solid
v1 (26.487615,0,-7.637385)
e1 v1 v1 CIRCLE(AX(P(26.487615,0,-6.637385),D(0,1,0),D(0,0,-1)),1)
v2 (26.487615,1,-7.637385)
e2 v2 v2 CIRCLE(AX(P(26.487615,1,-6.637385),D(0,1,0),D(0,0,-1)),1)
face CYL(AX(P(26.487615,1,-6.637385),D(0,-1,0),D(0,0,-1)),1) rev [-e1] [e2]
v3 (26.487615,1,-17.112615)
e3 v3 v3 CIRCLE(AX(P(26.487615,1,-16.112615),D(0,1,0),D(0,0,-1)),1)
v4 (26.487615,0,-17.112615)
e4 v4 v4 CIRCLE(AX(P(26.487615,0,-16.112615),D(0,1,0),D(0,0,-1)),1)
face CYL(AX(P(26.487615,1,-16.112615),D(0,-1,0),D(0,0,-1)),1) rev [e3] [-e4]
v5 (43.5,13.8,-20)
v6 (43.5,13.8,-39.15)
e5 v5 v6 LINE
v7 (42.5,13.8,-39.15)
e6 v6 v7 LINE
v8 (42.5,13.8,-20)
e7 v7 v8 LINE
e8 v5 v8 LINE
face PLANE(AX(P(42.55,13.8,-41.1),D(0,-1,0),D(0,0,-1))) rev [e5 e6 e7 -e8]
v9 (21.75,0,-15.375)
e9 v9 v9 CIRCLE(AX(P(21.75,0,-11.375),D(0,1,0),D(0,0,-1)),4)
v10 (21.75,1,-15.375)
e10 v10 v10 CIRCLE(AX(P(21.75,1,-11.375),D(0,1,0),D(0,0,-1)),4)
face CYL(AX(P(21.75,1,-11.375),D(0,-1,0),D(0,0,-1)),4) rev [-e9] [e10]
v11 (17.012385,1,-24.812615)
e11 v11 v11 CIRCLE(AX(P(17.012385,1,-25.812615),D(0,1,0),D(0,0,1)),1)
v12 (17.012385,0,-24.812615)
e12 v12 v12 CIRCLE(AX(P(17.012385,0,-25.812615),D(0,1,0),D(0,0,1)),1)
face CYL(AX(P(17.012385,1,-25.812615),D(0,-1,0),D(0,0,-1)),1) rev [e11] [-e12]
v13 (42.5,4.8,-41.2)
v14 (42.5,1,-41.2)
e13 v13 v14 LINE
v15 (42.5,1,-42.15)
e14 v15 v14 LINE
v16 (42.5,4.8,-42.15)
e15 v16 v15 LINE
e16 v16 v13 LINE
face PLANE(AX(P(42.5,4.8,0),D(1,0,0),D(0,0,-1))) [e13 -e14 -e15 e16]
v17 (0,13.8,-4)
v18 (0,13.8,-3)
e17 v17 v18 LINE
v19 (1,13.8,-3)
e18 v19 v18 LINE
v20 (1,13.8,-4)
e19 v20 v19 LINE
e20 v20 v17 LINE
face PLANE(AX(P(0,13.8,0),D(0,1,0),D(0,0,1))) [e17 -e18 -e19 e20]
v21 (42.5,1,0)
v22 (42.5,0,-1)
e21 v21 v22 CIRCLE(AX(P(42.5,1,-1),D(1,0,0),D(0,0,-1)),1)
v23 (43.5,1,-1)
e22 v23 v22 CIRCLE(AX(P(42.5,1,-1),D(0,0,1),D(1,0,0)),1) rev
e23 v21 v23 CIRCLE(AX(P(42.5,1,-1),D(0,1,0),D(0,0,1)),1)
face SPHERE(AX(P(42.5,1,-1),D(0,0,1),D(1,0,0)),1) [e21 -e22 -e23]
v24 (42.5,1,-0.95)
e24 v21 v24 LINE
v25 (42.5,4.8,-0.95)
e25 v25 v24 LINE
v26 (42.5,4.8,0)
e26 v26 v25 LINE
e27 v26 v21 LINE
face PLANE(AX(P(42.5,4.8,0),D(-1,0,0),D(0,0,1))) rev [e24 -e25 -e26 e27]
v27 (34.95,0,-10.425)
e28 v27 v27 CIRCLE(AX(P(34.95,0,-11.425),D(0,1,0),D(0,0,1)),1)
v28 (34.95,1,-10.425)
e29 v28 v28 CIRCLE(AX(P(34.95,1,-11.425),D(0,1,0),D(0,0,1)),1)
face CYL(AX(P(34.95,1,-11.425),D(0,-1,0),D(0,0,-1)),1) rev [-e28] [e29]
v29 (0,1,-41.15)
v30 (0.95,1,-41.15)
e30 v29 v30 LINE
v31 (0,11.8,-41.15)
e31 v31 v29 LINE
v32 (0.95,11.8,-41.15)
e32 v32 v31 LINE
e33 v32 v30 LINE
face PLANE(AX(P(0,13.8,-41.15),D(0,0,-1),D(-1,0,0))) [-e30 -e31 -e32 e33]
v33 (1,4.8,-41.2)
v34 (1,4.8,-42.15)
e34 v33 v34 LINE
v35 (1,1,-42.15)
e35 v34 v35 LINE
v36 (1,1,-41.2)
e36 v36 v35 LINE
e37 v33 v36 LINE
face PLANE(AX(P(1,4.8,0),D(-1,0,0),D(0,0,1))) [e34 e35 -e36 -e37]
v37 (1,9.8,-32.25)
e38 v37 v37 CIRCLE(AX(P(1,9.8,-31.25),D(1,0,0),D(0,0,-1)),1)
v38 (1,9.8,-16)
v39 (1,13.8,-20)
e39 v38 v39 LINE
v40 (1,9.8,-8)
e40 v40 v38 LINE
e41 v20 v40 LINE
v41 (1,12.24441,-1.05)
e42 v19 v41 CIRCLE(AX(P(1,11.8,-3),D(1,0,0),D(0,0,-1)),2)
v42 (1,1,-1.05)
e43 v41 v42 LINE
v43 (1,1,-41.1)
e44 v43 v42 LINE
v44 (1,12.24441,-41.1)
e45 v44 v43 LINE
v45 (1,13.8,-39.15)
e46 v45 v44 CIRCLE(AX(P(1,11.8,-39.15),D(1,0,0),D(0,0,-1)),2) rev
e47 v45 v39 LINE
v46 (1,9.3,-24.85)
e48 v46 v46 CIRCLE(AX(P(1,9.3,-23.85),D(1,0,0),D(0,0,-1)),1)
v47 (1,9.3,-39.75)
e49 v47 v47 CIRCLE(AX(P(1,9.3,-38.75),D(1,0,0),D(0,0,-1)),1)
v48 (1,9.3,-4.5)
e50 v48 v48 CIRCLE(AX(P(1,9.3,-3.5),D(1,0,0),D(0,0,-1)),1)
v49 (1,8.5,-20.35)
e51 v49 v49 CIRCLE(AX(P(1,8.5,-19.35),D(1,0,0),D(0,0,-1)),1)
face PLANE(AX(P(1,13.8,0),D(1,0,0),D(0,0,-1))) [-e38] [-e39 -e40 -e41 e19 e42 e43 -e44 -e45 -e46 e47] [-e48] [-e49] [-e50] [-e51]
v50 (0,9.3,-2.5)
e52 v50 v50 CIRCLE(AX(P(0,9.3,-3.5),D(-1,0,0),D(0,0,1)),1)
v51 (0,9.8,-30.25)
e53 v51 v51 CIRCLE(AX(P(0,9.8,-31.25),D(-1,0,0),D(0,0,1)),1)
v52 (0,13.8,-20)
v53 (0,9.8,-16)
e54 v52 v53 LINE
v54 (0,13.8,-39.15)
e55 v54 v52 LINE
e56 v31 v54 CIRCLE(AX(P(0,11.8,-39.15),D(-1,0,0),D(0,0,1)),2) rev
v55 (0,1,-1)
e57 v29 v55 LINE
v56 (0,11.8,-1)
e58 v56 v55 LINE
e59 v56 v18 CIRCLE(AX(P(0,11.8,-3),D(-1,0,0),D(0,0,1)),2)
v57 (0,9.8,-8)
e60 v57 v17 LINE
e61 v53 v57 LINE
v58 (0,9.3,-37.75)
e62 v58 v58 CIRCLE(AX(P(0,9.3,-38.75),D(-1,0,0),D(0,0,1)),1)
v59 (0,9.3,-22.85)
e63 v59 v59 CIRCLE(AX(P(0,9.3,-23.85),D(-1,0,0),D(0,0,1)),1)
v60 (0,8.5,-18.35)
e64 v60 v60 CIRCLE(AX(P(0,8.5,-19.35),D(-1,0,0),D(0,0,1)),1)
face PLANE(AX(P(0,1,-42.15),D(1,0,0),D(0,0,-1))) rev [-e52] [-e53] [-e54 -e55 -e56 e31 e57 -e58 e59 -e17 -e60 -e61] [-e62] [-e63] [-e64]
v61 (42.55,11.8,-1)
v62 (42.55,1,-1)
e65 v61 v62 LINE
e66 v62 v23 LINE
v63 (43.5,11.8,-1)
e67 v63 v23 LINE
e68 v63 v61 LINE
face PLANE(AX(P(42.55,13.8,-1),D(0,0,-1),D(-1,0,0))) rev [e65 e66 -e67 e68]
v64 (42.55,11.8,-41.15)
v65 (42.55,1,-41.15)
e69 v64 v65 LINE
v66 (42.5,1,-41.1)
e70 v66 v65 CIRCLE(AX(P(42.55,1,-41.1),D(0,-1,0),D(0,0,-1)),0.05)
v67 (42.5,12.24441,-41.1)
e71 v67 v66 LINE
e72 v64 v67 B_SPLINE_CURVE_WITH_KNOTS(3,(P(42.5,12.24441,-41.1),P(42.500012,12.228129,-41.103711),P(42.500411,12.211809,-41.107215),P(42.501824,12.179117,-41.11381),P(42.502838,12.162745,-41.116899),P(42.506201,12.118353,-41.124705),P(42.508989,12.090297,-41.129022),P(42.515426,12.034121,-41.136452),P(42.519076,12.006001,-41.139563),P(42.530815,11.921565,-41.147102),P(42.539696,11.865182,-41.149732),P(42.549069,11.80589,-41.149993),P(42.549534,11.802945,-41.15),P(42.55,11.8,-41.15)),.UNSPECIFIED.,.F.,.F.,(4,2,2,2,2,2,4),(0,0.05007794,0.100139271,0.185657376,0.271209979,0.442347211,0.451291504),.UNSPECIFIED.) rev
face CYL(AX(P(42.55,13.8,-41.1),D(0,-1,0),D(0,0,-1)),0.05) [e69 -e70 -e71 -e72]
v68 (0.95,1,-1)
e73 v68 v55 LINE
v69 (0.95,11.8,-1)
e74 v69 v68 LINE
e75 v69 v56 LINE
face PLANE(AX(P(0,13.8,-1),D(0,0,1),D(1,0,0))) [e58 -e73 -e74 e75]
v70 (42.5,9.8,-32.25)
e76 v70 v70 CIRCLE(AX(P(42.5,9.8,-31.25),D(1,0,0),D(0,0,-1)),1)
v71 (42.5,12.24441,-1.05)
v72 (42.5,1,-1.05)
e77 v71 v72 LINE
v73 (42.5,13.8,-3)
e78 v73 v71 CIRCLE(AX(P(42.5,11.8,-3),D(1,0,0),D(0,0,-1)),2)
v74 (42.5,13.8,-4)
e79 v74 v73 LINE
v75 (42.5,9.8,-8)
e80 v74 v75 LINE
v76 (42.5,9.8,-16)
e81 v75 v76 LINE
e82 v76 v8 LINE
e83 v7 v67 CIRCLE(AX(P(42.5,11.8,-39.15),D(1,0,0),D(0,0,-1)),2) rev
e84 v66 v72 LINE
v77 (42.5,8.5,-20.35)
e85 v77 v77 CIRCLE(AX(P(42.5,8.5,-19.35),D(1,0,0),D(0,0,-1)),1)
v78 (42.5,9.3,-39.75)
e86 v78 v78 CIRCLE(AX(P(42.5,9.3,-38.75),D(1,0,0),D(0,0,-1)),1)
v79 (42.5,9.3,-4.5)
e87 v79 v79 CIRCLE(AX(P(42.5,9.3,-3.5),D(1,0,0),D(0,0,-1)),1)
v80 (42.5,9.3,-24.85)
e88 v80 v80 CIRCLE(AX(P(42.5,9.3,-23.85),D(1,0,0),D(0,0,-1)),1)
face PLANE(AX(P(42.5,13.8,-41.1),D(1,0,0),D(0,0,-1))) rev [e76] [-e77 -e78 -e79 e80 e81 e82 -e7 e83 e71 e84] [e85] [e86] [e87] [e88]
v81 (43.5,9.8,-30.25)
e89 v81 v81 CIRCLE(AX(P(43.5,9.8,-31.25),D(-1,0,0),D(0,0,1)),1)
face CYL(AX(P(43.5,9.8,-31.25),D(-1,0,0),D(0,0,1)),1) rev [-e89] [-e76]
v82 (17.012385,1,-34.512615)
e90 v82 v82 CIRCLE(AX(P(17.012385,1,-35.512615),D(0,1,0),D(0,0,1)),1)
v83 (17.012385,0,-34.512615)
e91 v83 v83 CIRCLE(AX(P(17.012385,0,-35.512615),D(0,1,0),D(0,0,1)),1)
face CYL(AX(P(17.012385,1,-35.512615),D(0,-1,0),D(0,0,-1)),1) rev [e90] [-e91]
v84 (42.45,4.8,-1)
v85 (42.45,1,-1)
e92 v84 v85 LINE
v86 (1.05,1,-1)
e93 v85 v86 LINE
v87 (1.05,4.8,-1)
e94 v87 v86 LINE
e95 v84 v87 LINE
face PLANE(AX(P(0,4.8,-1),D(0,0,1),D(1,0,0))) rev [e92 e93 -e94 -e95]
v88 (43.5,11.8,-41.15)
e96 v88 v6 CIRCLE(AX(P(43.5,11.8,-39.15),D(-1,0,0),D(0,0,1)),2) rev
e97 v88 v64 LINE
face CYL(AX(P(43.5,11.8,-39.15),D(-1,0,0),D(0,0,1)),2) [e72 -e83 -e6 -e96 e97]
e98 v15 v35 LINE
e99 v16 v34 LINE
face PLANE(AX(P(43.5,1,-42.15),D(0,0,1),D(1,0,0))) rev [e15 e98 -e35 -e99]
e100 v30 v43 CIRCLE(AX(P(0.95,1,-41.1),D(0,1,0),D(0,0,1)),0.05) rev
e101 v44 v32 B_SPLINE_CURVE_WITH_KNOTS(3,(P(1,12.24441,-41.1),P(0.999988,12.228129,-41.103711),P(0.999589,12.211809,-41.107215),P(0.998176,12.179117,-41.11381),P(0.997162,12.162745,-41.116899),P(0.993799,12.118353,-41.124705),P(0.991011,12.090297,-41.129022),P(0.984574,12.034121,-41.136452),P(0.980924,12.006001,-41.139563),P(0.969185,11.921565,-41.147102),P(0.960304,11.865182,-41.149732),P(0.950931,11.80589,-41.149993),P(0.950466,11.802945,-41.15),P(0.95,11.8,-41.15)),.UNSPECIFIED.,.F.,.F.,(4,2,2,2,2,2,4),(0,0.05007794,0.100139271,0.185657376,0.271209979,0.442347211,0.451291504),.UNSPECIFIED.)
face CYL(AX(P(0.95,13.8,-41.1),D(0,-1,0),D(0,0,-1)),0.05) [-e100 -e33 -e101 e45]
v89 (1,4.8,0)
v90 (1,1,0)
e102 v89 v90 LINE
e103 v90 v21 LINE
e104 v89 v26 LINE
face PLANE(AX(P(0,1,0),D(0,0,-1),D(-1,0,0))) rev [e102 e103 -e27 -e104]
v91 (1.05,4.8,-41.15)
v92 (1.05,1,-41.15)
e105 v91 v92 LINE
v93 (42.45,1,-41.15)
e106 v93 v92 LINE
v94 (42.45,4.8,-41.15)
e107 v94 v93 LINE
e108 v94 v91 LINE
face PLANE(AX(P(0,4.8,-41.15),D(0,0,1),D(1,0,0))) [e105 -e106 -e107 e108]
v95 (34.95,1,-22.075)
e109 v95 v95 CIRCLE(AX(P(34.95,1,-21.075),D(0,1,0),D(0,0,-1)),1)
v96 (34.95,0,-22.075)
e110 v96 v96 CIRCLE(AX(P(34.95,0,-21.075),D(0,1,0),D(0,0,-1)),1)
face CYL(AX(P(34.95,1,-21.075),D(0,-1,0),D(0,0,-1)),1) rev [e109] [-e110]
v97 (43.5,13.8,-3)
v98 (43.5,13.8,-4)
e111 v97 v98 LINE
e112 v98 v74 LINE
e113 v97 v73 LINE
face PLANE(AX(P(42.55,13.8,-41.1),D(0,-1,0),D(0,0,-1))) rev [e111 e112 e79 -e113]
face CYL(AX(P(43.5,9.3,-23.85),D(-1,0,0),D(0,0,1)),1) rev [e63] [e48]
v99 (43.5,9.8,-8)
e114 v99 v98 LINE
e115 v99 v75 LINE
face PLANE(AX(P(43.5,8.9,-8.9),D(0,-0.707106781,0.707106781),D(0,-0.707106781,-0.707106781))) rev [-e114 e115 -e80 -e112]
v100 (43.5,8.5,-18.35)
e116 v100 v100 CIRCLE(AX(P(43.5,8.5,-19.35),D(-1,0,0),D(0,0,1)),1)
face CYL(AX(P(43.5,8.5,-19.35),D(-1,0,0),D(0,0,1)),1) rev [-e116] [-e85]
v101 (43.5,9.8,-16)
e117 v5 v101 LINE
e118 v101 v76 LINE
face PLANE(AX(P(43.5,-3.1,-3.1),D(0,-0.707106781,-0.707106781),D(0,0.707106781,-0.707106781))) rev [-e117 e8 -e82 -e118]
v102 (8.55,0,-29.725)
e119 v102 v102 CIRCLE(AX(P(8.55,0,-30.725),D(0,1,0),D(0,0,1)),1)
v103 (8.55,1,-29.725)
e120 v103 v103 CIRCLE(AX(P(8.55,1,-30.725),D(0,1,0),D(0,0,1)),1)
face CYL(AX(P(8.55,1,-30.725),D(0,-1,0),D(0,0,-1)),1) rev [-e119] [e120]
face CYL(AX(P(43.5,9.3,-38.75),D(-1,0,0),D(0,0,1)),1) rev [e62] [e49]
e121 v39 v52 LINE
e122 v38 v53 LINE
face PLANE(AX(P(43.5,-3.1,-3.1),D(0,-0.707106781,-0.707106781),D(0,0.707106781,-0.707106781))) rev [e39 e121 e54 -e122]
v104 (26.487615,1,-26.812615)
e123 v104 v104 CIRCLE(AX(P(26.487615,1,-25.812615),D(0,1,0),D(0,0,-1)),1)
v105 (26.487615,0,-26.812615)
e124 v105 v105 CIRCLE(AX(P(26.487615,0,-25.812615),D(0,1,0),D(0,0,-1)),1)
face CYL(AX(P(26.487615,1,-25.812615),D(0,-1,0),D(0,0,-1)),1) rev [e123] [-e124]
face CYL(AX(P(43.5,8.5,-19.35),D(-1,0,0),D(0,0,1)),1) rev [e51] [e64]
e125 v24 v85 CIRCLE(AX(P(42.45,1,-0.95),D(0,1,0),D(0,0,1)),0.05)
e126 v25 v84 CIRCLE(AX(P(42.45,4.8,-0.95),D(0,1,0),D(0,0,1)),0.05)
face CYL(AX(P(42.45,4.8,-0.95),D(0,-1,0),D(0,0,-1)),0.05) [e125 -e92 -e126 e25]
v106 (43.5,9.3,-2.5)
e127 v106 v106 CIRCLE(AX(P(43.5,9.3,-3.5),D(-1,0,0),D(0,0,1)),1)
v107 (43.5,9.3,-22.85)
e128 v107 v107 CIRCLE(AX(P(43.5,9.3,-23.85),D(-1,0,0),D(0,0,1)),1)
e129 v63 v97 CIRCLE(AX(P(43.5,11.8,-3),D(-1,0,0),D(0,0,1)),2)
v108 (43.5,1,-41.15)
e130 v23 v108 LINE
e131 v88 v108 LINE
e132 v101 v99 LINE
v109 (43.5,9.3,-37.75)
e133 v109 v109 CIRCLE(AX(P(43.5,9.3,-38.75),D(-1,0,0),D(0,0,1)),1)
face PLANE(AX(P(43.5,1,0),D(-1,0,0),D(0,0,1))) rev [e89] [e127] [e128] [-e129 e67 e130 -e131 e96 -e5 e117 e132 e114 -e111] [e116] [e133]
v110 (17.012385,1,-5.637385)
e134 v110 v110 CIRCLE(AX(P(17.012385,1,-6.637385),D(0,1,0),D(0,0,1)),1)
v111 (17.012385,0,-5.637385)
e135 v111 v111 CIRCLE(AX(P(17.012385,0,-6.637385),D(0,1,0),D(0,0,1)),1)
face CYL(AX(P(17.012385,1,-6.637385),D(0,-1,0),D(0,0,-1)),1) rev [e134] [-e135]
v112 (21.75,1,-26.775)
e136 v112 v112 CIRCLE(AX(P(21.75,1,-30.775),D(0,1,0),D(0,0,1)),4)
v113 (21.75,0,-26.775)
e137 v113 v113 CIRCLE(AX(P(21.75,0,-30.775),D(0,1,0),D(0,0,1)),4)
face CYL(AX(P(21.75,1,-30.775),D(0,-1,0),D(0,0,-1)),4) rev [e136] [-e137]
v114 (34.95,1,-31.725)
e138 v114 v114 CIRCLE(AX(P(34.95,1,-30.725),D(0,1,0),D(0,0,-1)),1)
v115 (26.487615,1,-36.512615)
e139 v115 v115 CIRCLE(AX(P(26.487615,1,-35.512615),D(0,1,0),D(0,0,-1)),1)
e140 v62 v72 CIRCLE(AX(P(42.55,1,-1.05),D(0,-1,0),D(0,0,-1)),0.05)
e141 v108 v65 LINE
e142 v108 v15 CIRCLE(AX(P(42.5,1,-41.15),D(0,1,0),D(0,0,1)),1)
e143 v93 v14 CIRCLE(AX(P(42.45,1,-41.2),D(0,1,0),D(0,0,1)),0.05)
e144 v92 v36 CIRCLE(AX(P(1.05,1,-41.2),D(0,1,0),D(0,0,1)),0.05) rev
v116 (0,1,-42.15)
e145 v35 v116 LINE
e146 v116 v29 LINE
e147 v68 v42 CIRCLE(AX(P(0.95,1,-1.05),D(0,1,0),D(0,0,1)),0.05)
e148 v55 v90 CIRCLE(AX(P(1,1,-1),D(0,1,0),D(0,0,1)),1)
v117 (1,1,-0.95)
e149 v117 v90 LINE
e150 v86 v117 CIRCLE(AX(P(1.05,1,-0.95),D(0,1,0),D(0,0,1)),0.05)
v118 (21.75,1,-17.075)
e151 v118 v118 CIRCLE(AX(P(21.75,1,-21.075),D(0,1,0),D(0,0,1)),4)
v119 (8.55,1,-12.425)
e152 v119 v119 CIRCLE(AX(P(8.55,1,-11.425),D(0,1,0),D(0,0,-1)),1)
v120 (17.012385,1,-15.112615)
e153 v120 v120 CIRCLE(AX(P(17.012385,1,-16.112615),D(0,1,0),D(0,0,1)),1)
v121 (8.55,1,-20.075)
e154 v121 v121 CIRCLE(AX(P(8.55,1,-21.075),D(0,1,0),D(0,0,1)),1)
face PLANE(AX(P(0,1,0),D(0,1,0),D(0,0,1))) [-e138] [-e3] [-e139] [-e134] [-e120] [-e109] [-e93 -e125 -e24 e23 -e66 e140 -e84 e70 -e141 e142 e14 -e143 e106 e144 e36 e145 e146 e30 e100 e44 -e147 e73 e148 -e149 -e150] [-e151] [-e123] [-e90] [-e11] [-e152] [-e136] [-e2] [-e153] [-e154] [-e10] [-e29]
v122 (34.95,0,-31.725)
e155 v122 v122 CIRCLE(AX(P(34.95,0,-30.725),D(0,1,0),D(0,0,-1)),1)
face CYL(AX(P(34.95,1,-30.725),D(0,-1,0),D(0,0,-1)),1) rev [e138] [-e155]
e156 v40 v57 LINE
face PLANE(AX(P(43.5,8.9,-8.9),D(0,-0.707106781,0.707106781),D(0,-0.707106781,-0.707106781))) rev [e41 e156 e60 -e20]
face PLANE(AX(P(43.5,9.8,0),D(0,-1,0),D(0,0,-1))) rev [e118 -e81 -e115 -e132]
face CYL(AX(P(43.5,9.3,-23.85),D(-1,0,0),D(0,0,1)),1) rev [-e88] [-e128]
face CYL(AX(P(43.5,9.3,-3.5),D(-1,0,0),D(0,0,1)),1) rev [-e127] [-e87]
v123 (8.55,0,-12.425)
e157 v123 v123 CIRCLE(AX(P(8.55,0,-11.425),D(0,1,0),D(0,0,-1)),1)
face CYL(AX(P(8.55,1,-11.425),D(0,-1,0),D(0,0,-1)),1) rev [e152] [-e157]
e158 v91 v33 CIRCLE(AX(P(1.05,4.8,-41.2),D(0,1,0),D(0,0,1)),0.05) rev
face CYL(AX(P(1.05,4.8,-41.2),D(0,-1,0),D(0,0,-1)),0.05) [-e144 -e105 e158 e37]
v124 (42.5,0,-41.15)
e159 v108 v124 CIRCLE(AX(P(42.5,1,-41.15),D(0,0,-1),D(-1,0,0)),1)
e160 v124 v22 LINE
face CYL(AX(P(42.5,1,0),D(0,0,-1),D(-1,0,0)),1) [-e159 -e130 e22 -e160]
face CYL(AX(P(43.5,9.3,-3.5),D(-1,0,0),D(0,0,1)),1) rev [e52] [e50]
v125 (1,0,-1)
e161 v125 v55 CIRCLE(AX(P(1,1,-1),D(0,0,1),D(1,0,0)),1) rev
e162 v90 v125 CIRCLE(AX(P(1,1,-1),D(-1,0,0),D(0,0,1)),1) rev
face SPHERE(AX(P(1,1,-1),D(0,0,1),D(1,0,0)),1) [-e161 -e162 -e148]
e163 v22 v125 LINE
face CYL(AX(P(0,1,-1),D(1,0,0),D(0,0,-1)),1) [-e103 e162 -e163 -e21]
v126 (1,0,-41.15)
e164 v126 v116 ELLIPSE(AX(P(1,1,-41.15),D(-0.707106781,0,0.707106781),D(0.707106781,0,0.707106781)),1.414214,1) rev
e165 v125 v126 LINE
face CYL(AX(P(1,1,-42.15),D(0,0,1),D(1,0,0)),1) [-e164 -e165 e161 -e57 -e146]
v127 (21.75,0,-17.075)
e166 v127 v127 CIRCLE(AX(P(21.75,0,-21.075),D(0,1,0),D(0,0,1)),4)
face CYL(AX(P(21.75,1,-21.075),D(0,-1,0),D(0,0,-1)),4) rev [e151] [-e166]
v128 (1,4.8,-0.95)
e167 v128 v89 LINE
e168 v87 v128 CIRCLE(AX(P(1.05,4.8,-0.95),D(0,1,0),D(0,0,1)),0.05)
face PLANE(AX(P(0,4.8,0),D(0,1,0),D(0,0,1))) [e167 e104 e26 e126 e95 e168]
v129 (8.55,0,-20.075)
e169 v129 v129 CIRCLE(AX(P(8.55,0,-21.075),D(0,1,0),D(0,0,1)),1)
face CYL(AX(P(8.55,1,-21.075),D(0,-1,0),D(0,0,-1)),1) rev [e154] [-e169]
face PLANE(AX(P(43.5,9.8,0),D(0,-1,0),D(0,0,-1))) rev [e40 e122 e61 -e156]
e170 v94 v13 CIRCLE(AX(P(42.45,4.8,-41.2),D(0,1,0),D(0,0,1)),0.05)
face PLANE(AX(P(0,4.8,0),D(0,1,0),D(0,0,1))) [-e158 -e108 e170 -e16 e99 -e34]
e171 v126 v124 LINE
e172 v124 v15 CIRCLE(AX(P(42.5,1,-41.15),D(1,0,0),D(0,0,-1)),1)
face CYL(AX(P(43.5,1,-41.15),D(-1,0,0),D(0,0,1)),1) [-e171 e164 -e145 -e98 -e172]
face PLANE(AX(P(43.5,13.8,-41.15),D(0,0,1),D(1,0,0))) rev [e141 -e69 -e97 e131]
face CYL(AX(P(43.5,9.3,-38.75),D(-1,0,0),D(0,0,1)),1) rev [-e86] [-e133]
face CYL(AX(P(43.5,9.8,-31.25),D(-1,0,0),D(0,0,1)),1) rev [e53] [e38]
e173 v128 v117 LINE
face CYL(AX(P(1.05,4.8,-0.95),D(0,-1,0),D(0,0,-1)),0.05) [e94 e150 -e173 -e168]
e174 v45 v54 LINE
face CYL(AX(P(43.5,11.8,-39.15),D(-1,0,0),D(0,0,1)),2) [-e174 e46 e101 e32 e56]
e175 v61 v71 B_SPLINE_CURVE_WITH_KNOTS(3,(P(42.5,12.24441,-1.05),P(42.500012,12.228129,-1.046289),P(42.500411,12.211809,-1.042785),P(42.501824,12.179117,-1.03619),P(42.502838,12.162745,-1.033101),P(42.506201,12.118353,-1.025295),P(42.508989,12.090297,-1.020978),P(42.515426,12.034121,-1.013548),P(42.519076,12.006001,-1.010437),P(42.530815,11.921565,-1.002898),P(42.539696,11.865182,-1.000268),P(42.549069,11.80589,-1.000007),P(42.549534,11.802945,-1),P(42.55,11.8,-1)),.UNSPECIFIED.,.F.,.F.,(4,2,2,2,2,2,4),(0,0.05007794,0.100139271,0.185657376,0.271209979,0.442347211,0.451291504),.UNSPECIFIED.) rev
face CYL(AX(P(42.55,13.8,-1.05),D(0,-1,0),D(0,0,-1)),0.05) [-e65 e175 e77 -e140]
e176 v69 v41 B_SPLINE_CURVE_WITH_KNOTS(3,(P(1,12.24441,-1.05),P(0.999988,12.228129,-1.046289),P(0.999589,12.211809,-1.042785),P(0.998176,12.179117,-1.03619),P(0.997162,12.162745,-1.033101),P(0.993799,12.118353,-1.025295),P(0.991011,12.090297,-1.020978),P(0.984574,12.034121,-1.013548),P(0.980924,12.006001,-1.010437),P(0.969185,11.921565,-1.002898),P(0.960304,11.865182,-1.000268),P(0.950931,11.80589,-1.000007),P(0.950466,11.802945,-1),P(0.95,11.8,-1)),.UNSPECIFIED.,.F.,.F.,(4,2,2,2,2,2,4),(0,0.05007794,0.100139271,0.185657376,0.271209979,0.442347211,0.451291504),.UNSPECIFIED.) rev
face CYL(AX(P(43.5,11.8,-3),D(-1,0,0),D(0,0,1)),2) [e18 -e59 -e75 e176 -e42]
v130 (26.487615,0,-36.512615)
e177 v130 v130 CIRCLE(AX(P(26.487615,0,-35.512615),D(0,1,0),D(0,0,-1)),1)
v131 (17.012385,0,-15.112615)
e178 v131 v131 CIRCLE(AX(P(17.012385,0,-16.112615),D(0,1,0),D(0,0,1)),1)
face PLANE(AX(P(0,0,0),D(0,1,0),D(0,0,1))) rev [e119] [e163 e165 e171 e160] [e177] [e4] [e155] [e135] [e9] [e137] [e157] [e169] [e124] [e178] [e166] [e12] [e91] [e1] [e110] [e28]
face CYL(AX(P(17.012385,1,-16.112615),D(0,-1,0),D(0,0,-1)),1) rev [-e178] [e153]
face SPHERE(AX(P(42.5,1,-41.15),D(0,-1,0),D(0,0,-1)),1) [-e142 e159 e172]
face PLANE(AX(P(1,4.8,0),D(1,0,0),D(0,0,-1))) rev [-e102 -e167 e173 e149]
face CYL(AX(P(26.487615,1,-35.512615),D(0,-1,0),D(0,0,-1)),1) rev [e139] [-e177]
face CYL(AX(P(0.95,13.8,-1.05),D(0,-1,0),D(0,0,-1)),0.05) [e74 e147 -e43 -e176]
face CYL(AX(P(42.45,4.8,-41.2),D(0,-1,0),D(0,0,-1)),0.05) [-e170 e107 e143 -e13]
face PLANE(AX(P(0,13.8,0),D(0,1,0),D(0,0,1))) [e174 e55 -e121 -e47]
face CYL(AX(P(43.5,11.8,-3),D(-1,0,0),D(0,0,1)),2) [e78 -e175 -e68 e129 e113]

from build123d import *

# Parameters (mm, degrees)
SKETCH1_W           = 43.5
SKETCH1_H           = 42.15
SKETCH1_R           = 4
SKETCH1_R_2         = 1
BOSS_EXTRUDE1_DEPTH = 1
BOSS_EXTRUDE2_DEPTH = 3.8
BOSS_EXTRUDE5_DEPTH = 12.8
FILLET1_R           = 1
SKETCH3_R           = 1
CUT_EXTRUDE1_DEPTH  = 63.12336517


with BuildPart() as part:
    # Sketch1 → Boss-Extrude1 (new body)
    with BuildSketch(Plane(origin=(0, 0, 0), x_dir=(1, 0, 0), z_dir=(0, 1, 0))):
        with Locations((21.75, 21.075)):
            Rectangle(SKETCH1_W, SKETCH1_H)
        with Locations(Location((21.75, 21.075, 0), (0, 0, 270))):
            Circle(SKETCH1_R, mode=Mode.SUBTRACT)
        with Locations(Location((21.75, 30.775, 0), (0, 0, 270))):
            Circle(SKETCH1_R, mode=Mode.SUBTRACT)
        with Locations(Location((21.75, 11.375, 0), (0, 0, 90))):
            Circle(SKETCH1_R, mode=Mode.SUBTRACT)
        with Locations(Location((8.55, 21.075, 0), (0, 0, 270))):
            Circle(SKETCH1_R_2, mode=Mode.SUBTRACT)
        with Locations(Location((8.55, 30.725, 0), (0, 0, 270))):
            Circle(SKETCH1_R_2, mode=Mode.SUBTRACT)
        with Locations(Location((8.55, 11.425, 0), (0, 0, 90))):
            Circle(SKETCH1_R_2, mode=Mode.SUBTRACT)
        with Locations(Location((34.95, 11.425, 0), (0, 0, 270))):
            Circle(SKETCH1_R_2, mode=Mode.SUBTRACT)
        with Locations(Location((34.95, 21.075, 0), (0, 0, 90))):
            Circle(SKETCH1_R_2, mode=Mode.SUBTRACT)
        with Locations(Location((34.95, 30.725, 0), (0, 0, 90))):
            Circle(SKETCH1_R_2, mode=Mode.SUBTRACT)
        with Locations(Location((17.012384566, 35.512615434, 0), (0, 0, 270))):
            Circle(SKETCH1_R_2, mode=Mode.SUBTRACT)
        with Locations(Location((17.012384566, 25.812615434, 0), (0, 0, 270))):
            Circle(SKETCH1_R_2, mode=Mode.SUBTRACT)
        with Locations(Location((17.012384566, 16.112615434, 0), (0, 0, 270))):
            Circle(SKETCH1_R_2, mode=Mode.SUBTRACT)
        with Locations(Location((17.012384566, 6.637384566, 0), (0, 0, 270))):
            Circle(SKETCH1_R_2, mode=Mode.SUBTRACT)
        with Locations(Location((26.487615434, 6.637384566, 0), (0, 0, 90))):
            Circle(SKETCH1_R_2, mode=Mode.SUBTRACT)
        with Locations(Location((26.487615434, 16.112615434, 0), (0, 0, 90))):
            Circle(SKETCH1_R_2, mode=Mode.SUBTRACT)
        with Locations(Location((26.487615434, 25.812615434, 0), (0, 0, 90))):
            Circle(SKETCH1_R_2, mode=Mode.SUBTRACT)
        with Locations(Location((26.487615434, 35.512615434, 0), (0, 0, 90))):
            Circle(SKETCH1_R_2, mode=Mode.SUBTRACT)
    extrude(amount=BOSS_EXTRUDE1_DEPTH)

    # Sketch2 → Boss-Extrude2 (add)
    with BuildSketch(Plane(origin=(0, 1, 0), x_dir=(1, 0, 0), z_dir=(0, 1, 0))):
        with BuildLine():
            Line((1, 0.95), (1, 0))
            Line((1, 0), (42.5, 0))
            Line((42.5, 0), (42.5, 0.95))
            ThreePointArc((42.5, 0.95), (42.485355339, 0.985355339), (42.45, 1))
            Line((42.45, 1), (1.05, 1))
            ThreePointArc((1.05, 1), (1.014644661, 0.985355339), (1, 0.95))
        make_face()
        with BuildLine():
            Line((1.05, 41.15), (42.45, 41.15))
            ThreePointArc((42.45, 41.15), (42.485355339, 41.164644661), (42.5, 41.2))
            Line((42.5, 41.2), (42.5, 42.15))
            Line((42.5, 42.15), (1, 42.15))
            Line((1, 42.15), (1, 41.2))
            ThreePointArc((1, 41.2), (1.014644661, 41.164644661), (1.05, 41.15))
        make_face()
    extrude(amount=BOSS_EXTRUDE2_DEPTH)

    # Sketch2<6> → Boss-Extrude5 (add)
    with BuildSketch(Plane(origin=(0, 1, 0), x_dir=(1, 0, 0), z_dir=(0, 1, 0))):
        with BuildLine():
            Line((0.95, 41.15), (0, 41.15))
            Line((0, 41.15), (0, 1))
            Line((0, 1), (0.95, 1))
            ThreePointArc((0.95, 1), (0.985355339, 1.014644661), (1, 1.05))
            Line((1, 1.05), (1, 41.1))
            ThreePointArc((1, 41.1), (0.985355339, 41.135355339), (0.95, 41.15))
        make_face()
        with BuildLine():
            Line((43.5, 1), (43.5, 41.15))
            Line((43.5, 41.15), (42.55, 41.15))
            ThreePointArc((42.55, 41.15), (42.514644661, 41.135355339), (42.5, 41.1))
            Line((42.5, 41.1), (42.5, 1.05))
            ThreePointArc((42.5, 1.05), (42.514644661, 1.014644661), (42.55, 1))
            Line((42.55, 1), (43.5, 1))
        make_face()
    extrude(amount=BOSS_EXTRUDE5_DEPTH)

    # Fillet1
    # the kernel refuses this fillet: 1 mm, written as the material it takes off along each edge
    with BuildSketch(Plane(origin=(42.5, 1, -41.15), x_dir=(1, 0, 0), z_dir=(0, 0, -1))) as fillet1_piece_1_section:
        Polygon((0, 0), (FILLET1_R * 1.02, 0), (FILLET1_R * 1.02, FILLET1_R * 1.02), (0, FILLET1_R * 1.02), align=None)
    fillet1_piece_1 = extrude(amount=FILLET1_R * 1.02, mode=Mode.PRIVATE)
    fillet1_piece_1 = fillet1_piece_1 - Plane(origin=(42.5, 1, -41.15), x_dir=(-0.7071067811865475, 0.7071067811865475, 0), z_dir=(0, 0, -1)) * Sphere(FILLET1_R, mode=Mode.PRIVATE)
    add(fillet1_piece_1, mode=Mode.SUBTRACT)
    with BuildSketch(Plane(origin=(42.5, 1, -1), x_dir=(1, 0, 0), z_dir=(0, 0, 1))) as fillet1_piece_2_section:
        Polygon((0, 0), (FILLET1_R * 1.02, 0), (FILLET1_R * 1.02, -FILLET1_R * 1.02), (0, -FILLET1_R * 1.02), align=None)
    fillet1_piece_2 = extrude(amount=FILLET1_R * 1.02, mode=Mode.PRIVATE)
    fillet1_piece_2 = fillet1_piece_2 - Plane(origin=(42.5, 1, -1), x_dir=(-0.7071067811865475, 0.7071067811865475, 0), z_dir=(0, 0, 1)) * Sphere(FILLET1_R, mode=Mode.PRIVATE)
    add(fillet1_piece_2, mode=Mode.SUBTRACT)
    with BuildSketch(Plane(origin=(1, 1, -1), x_dir=(-1, 0, 0), z_dir=(0, 0, 1))) as fillet1_piece_3_section:
        Polygon((0, 0), (FILLET1_R * 1.02, 0), (FILLET1_R * 1.02, FILLET1_R * 1.02), (0, FILLET1_R * 1.02), align=None)
    fillet1_piece_3 = extrude(amount=FILLET1_R * 1.02, mode=Mode.PRIVATE)
    fillet1_piece_3 = fillet1_piece_3 - Plane(origin=(1, 1, -1), x_dir=(0.7071067811865475, 0.7071067811865475, 0), z_dir=(0, 0, 1)) * Sphere(FILLET1_R, mode=Mode.PRIVATE)
    add(fillet1_piece_3, mode=Mode.SUBTRACT)
    with BuildSketch(Plane(origin=(42.5, 0, -42.15), x_dir=(0, 0, 1), z_dir=(-1, 0, 0))) as fillet1_piece_4:
        with BuildLine():
            CenterArc((FILLET1_R, FILLET1_R), FILLET1_R, 180, 90)
            Line((0, FILLET1_R), (0, 0))
            Line((0, 0), (FILLET1_R, 0))
        make_face()
    extrude(amount=45, mode=Mode.SUBTRACT)
    with BuildSketch(Plane(origin=(43.5, 0, -1), x_dir=(0, 1, 0), z_dir=(0, 0, -1))) as fillet1_piece_5:
        with BuildLine():
            CenterArc((FILLET1_R, -FILLET1_R), FILLET1_R, 90, 90)
            Line((0, -FILLET1_R), (0, 0))
            Line((0, 0), (FILLET1_R, 0))
        make_face()
    extrude(amount=40.15, mode=Mode.SUBTRACT)
    with BuildSketch(Plane(origin=(1, 0, 0), x_dir=(0, 1, 0), z_dir=(1, 0, 0))) as fillet1_piece_6:
        with BuildLine():
            CenterArc((FILLET1_R, -FILLET1_R), FILLET1_R, 90, 90)
            Line((0, -FILLET1_R), (0, 0))
            Line((0, 0), (FILLET1_R, 0))
        make_face()
    extrude(amount=41.5, mode=Mode.SUBTRACT)
    with BuildSketch(Plane(origin=(0, 0, -44.65), x_dir=(0, 1, 0), z_dir=(0, 0, 1))) as fillet1_piece_7:
        with BuildLine():
            CenterArc((FILLET1_R, -FILLET1_R), FILLET1_R, 90, 90)
            Line((0, -FILLET1_R), (0, 0))
            Line((0, 0), (FILLET1_R, 0))
        make_face()
    extrude(amount=43.65, mode=Mode.SUBTRACT)

    # Sketch3 → Cut-Extrude1 (cut, through all)
    with BuildSketch(Plane.ZY):
        with BuildLine():
            ThreePointArc((-3, 13.8), (-1.585786438, 13.214213562), (-1, 11.8))
            Line((-1, 11.8), (-1, 13.8))
            Line((-1, 13.8), (-3, 13.8))
        make_face()
        Polygon((-4, 13.8), (-20, 13.8), (-16, 9.8), (-8, 9.8), align=None)
        with Locations((-19.35, 8.5)):
            Circle(SKETCH3_R)
        with Locations((-23.85, 9.3)):
            Circle(SKETCH3_R)
        with Locations((-31.25, 9.8)):
            Circle(SKETCH3_R)
        with Locations((-38.75, 9.3)):
            Circle(SKETCH3_R)
        with BuildLine():
            Line((-39.15, 13.8), (-41.15, 13.8))
            Line((-41.15, 13.8), (-41.15, 11.8))
            ThreePointArc((-41.15, 11.8), (-40.564213562, 13.214213562), (-39.15, 13.8))
        make_face()
        with Locations((-3.5, 9.3)):
            Circle(SKETCH3_R)
    extrude(amount=-CUT_EXTRUDE1_DEPTH, mode=Mode.SUBTRACT)


solid = part.part
